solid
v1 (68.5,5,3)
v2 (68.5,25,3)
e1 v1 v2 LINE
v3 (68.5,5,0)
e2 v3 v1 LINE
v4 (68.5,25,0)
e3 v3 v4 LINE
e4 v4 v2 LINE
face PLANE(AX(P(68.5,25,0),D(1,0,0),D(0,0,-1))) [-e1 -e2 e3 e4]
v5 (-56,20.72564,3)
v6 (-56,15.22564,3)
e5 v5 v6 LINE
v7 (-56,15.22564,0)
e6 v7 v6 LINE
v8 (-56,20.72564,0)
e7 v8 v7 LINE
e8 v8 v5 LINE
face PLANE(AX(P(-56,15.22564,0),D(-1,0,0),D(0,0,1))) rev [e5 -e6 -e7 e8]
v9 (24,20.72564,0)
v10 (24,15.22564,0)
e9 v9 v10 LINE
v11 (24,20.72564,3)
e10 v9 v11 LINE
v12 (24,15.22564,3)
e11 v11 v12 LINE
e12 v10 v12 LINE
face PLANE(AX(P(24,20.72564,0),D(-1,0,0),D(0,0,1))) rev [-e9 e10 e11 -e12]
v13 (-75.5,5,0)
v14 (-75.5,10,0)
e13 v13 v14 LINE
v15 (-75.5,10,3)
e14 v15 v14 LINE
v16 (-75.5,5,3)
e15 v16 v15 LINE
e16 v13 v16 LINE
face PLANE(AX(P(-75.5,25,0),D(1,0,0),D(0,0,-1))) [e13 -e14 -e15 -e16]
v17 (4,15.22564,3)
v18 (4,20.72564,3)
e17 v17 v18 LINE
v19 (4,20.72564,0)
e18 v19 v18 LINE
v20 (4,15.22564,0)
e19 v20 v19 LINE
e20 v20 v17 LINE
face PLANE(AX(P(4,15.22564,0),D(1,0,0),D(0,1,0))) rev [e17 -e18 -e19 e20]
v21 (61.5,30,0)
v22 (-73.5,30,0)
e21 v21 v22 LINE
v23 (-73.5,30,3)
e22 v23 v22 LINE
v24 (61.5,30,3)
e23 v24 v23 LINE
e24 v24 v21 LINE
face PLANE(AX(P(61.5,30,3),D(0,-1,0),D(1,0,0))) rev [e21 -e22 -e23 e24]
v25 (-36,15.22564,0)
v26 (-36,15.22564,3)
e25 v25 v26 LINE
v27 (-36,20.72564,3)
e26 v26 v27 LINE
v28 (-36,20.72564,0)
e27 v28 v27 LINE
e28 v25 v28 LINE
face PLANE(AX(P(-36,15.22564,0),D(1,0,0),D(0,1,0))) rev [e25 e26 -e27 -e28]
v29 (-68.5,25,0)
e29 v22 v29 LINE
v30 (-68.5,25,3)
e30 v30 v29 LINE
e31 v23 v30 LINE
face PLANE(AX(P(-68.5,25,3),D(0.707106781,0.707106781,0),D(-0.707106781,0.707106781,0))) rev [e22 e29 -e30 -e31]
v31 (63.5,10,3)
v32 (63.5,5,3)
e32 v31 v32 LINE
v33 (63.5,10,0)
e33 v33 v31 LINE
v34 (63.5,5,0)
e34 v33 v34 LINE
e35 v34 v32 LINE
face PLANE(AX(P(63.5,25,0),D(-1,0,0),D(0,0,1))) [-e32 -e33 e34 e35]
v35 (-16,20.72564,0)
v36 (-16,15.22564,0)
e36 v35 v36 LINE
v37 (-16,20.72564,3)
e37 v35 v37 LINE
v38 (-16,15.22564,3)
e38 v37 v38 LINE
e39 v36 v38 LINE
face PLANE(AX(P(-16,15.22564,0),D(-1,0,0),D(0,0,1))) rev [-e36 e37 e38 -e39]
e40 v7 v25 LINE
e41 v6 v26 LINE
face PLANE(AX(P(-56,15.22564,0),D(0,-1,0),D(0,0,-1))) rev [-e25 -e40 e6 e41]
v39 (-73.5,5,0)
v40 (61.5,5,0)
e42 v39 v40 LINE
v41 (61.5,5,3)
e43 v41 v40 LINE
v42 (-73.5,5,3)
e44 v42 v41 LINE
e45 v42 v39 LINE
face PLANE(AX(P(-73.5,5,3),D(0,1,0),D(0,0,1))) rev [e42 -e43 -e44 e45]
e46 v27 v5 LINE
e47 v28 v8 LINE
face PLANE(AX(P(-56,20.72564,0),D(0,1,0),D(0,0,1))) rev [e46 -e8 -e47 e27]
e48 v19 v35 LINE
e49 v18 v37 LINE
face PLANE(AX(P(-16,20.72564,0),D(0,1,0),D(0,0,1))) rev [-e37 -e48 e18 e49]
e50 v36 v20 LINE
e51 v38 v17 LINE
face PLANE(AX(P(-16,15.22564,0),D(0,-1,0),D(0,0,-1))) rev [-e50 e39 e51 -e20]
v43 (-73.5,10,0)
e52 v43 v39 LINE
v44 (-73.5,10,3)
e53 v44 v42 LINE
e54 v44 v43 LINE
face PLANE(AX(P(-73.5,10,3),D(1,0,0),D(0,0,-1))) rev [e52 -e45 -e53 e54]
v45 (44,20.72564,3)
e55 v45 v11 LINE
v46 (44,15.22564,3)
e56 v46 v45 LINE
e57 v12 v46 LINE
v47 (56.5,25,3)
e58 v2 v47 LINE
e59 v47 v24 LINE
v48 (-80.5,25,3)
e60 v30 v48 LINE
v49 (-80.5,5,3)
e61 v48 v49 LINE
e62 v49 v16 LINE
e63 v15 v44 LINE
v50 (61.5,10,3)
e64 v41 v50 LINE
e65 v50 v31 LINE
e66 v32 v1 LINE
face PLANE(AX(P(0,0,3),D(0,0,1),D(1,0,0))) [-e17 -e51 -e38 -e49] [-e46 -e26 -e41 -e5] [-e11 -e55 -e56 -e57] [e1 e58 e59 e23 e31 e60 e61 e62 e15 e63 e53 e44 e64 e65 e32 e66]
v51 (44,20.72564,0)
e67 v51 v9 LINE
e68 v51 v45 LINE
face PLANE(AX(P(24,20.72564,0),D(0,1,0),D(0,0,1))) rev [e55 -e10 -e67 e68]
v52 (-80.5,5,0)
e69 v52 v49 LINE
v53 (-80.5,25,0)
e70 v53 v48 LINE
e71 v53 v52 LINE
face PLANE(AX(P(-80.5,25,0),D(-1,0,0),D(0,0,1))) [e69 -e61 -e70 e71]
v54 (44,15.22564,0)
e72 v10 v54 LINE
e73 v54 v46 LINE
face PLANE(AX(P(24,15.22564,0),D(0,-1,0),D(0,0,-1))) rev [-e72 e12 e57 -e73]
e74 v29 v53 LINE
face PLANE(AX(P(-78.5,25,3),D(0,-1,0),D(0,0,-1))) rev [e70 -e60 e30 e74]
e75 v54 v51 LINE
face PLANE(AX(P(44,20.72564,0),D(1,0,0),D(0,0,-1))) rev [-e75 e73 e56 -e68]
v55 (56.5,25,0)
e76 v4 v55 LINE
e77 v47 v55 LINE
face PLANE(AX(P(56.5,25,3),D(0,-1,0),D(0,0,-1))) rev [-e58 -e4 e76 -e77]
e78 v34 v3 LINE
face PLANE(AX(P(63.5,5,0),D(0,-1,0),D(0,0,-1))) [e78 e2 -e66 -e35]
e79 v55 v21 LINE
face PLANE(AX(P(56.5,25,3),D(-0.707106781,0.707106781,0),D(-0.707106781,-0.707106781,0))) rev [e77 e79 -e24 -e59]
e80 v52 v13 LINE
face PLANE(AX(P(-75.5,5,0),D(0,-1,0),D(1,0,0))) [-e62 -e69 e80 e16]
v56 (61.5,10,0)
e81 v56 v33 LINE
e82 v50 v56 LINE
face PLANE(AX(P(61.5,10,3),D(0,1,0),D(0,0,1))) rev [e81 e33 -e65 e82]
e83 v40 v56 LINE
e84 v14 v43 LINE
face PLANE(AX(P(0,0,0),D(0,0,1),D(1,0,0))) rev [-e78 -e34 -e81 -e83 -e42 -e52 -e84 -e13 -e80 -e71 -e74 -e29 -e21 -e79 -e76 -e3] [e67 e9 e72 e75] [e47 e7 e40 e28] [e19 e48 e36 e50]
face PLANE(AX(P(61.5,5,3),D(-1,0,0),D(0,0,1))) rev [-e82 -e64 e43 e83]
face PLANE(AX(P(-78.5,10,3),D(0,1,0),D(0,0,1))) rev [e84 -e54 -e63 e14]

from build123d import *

# Parameters (mm, degrees)
EXTRUDE_1_DEPTH         = 3
CUT_EXTRUDE_START       = -3
CUT_EXTRUDE_1_OUTLINE_W = 20
CUT_EXTRUDE_1_OUTLINE_H = 5.5
CUT_EXTRUDE_1_DEPTH     = 3
CUT_EXTRUDE_1_2_DEPTH   = 3


# Read off the part's stored shape, not the designer's step: 切除-拉伸1
with BuildPart() as part:
    # 草图1 → 凸台-拉伸1 (new body)
    with BuildSketch(Plane.XY):
        Polygon((-78.5, 25), (-68.5, 25), (-73.5, 30), (61.5, 30), (56.5, 25), (66.5, 25), (66.5, 10), (61.5, 10), (61.5, 5), (-73.5, 5), (-73.5, 10), (-78.5, 10), align=None)
    extrude(amount=EXTRUDE_1_DEPTH)

    # 切除-拉伸1 outline → 切除-拉伸1 (cut)
    with BuildSketch(Plane.XY.offset(3).offset(CUT_EXTRUDE_START)):
        with Locations((-6, 17.975640355)):
            Rectangle(CUT_EXTRUDE_1_OUTLINE_W, CUT_EXTRUDE_1_OUTLINE_H)
        with Locations((-46, 17.975640355)):
            Rectangle(CUT_EXTRUDE_1_OUTLINE_W, CUT_EXTRUDE_1_OUTLINE_H)
        with Locations((34, 17.975640355)):
            Rectangle(CUT_EXTRUDE_1_OUTLINE_W, CUT_EXTRUDE_1_OUTLINE_H)
    extrude(amount=CUT_EXTRUDE_1_DEPTH, mode=Mode.SUBTRACT)

    # Cut-Extrude 1 2 outline → Cut-Extrude 1 2 (add)
    with BuildSketch(Plane.XY.offset(3).offset(CUT_EXTRUDE_START)):
        Polygon((-78.5, 25), (-80.5, 25), (-80.5, 5), (-75.5, 5), (-75.5, 10), (-78.5, 10), align=None)
        Polygon((68.5, 25), (66.5, 25), (66.5, 10), (63.5, 10), (63.5, 5), (68.5, 5), align=None)
    extrude(amount=CUT_EXTRUDE_1_2_DEPTH)


solid = part.part
